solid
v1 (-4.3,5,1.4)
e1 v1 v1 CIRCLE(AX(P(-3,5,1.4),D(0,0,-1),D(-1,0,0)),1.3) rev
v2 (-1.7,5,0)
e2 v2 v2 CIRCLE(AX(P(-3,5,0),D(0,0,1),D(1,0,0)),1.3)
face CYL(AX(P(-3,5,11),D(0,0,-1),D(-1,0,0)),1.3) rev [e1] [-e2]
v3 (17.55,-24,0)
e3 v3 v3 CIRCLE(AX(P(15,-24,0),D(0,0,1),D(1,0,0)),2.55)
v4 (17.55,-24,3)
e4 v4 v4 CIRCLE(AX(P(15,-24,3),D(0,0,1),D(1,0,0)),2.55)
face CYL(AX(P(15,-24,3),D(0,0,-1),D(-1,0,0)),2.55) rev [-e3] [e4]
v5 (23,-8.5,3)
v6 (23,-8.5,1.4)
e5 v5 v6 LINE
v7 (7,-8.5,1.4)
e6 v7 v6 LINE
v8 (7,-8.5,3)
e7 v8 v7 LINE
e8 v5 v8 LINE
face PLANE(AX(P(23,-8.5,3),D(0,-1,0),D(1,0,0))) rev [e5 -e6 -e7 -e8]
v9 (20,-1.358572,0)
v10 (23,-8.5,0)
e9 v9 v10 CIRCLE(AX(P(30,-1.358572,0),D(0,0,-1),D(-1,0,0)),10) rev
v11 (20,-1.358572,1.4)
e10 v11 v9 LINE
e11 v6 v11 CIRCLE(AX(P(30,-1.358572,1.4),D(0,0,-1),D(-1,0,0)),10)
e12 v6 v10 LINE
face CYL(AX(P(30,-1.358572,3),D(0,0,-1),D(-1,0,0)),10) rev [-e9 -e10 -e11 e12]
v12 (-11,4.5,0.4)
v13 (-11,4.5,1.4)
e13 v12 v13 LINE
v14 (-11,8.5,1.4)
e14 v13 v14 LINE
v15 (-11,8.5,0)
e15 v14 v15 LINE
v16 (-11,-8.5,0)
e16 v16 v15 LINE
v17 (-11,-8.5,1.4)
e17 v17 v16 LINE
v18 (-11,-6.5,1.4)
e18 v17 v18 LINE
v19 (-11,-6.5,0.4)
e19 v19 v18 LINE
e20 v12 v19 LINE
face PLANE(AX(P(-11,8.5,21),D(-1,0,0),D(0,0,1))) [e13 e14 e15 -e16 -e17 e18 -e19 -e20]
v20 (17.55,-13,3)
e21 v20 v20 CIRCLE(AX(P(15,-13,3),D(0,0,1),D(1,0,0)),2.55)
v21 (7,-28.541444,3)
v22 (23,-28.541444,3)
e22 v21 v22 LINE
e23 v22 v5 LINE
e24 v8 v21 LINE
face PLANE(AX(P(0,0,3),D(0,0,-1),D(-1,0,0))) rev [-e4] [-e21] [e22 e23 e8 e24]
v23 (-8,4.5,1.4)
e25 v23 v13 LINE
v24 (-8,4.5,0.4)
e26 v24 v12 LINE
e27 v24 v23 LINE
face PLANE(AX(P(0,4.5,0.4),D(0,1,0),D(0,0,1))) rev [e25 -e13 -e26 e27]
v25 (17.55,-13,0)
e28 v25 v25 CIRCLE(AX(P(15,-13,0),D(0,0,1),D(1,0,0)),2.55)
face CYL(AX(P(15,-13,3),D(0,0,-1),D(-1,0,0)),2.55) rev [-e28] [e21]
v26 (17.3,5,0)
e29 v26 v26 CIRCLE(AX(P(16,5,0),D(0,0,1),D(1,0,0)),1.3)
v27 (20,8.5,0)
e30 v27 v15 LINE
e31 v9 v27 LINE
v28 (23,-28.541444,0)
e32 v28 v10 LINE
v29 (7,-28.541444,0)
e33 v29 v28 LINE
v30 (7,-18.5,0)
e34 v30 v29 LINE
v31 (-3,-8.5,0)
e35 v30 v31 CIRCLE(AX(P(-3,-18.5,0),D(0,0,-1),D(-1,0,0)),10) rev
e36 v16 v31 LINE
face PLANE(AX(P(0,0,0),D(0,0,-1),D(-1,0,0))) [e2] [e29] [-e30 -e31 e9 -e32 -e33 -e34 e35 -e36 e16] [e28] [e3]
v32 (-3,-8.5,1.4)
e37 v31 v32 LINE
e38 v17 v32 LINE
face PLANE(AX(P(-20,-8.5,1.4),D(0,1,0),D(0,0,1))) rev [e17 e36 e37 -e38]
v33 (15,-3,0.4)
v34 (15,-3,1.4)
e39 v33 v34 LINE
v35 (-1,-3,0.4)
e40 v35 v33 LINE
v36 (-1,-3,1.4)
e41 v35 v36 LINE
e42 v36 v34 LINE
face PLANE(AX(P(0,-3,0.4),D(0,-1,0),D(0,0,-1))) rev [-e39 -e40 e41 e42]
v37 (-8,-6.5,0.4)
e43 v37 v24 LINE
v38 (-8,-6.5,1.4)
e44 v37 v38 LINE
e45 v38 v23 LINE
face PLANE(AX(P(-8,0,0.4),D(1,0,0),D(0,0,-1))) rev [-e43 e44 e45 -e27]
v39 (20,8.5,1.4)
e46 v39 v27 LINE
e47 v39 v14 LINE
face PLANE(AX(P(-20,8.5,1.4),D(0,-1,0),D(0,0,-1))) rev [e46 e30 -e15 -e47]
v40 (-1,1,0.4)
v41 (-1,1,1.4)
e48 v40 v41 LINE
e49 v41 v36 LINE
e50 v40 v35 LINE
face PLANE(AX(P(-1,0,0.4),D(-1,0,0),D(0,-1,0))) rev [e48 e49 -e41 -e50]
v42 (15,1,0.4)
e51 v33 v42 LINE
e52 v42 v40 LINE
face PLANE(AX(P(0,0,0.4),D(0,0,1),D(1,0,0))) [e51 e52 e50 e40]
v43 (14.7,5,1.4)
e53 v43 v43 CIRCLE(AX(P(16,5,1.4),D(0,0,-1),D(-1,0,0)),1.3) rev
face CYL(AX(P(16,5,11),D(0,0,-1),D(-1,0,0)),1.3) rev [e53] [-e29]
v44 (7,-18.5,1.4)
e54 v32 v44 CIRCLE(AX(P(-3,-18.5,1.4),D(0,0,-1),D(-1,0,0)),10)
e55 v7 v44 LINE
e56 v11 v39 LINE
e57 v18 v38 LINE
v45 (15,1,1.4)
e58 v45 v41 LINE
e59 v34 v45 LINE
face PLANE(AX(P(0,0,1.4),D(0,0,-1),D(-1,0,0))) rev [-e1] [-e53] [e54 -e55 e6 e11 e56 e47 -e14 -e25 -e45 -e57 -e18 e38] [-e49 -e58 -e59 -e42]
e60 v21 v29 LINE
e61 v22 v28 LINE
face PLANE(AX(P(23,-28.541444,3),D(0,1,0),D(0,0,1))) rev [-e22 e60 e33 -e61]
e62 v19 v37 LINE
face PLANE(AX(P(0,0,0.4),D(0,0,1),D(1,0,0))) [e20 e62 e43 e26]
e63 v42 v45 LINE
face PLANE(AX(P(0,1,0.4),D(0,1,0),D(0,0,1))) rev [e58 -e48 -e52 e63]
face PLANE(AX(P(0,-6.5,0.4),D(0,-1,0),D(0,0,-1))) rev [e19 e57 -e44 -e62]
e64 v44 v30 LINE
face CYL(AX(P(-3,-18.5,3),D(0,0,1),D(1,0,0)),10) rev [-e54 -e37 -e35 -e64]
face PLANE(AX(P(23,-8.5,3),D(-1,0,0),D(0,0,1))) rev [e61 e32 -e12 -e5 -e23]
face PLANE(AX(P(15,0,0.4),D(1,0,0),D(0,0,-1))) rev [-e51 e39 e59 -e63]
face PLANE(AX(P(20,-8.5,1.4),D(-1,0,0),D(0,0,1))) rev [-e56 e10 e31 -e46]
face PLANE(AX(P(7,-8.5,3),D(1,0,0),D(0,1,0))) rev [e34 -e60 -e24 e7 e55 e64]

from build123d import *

# Parameters (mm, degrees)
SKETCH1_W           = 40
SKETCH1_H           = 17
BOSS_EXTRUDE1_DEPTH = 1.4
CUT_EXTRUDE1_START  = 1.4
SKETCH3_W           = 16
SKETCH3_H           = 4
SKETCH3_W_2         = 3
SKETCH3_H_2         = 11
CUT_EXTRUDE1_DEPTH  = 1
SKETCH4_R           = 1.3
CUT_EXTRUDE2_DEPTH  = 11
SKETCH7_W           = 9
SKETCH7_H           = 17
CUT_EXTRUDE5_DEPTH  = 21
SKETCH9_W           = 16
SKETCH9_H           = 20.041444064
SKETCH9_R           = 2.55
BOSS_EXTRUDE3_DEPTH = 3
FILLET1_R           = 10


with BuildPart() as part:
    # Sketch1 → Boss-Extrude1 (new body)
    with BuildSketch(Plane.XY):
        Rectangle(SKETCH1_W, SKETCH1_H)
    extrude(amount=BOSS_EXTRUDE1_DEPTH)

    # Sketch3 → Cut-Extrude1 (cut)
    with BuildSketch(Plane.XY.offset(CUT_EXTRUDE1_START)):
        with Locations((7, -1)):
            Rectangle(SKETCH3_W, SKETCH3_H)
        with Locations((-9.5, -1)):
            Rectangle(SKETCH3_W_2, SKETCH3_H_2)
    extrude(amount=-CUT_EXTRUDE1_DEPTH, mode=Mode.SUBTRACT)

    # Sketch4 → Cut-Extrude2 (cut)
    with BuildSketch(Plane.XY):
        with Locations(Location((16, 5, 0), (0, 0, 180))):
            Circle(SKETCH4_R)
        with Locations(Location((-3, 5, 0), (0, 0, 180))):
            Circle(SKETCH4_R)
    extrude(amount=CUT_EXTRUDE2_DEPTH, mode=Mode.SUBTRACT)

    # Sketch7 → Cut-Extrude5 (cut)
    with BuildSketch(Plane.XY):
        with Locations((-15.5, 0)):
            Rectangle(SKETCH7_W, SKETCH7_H)
    extrude(amount=CUT_EXTRUDE5_DEPTH, mode=Mode.SUBTRACT)

    # Sketch9 → Boss-Extrude3 (add)
    with BuildSketch(Plane.XY):
        with Locations((15, -18.520722032)):
            Rectangle(SKETCH9_W, SKETCH9_H)
        with Locations((15, -13)):
            Circle(SKETCH9_R, mode=Mode.SUBTRACT)
        with Locations((15, -24)):
            Circle(SKETCH9_R, mode=Mode.SUBTRACT)
    extrude(amount=BOSS_EXTRUDE3_DEPTH)

    # Fillet1
    # the kernel refuses this fillet: 10 mm, written as the material it adds along each edge
    with BuildSketch(Plane(origin=(7, -8.5, 0), x_dir=(-1, 0, 0), z_dir=(0, 0, 1))) as fillet1_piece_1:
        with BuildLine():
            CenterArc((FILLET1_R, FILLET1_R), FILLET1_R, 180, 90)
            Line((0, FILLET1_R), (0, 0))
            Line((0, 0), (FILLET1_R, 0))
        make_face()
    extrude(amount=1.4)
    with BuildSketch(Plane(origin=(20, -8.5, 0), x_dir=(0, 1, 0), z_dir=(0, 0, 1))) as fillet1_piece_2:
        with BuildLine():
            CenterArc((7.141428429, -10), FILLET1_R, 90, 45.572995999)
            Line((0, -3), (0, 0))
            Line((0, 0), (7.141428429, 0))
        make_face()
    extrude(amount=1.4)


solid = part.part
